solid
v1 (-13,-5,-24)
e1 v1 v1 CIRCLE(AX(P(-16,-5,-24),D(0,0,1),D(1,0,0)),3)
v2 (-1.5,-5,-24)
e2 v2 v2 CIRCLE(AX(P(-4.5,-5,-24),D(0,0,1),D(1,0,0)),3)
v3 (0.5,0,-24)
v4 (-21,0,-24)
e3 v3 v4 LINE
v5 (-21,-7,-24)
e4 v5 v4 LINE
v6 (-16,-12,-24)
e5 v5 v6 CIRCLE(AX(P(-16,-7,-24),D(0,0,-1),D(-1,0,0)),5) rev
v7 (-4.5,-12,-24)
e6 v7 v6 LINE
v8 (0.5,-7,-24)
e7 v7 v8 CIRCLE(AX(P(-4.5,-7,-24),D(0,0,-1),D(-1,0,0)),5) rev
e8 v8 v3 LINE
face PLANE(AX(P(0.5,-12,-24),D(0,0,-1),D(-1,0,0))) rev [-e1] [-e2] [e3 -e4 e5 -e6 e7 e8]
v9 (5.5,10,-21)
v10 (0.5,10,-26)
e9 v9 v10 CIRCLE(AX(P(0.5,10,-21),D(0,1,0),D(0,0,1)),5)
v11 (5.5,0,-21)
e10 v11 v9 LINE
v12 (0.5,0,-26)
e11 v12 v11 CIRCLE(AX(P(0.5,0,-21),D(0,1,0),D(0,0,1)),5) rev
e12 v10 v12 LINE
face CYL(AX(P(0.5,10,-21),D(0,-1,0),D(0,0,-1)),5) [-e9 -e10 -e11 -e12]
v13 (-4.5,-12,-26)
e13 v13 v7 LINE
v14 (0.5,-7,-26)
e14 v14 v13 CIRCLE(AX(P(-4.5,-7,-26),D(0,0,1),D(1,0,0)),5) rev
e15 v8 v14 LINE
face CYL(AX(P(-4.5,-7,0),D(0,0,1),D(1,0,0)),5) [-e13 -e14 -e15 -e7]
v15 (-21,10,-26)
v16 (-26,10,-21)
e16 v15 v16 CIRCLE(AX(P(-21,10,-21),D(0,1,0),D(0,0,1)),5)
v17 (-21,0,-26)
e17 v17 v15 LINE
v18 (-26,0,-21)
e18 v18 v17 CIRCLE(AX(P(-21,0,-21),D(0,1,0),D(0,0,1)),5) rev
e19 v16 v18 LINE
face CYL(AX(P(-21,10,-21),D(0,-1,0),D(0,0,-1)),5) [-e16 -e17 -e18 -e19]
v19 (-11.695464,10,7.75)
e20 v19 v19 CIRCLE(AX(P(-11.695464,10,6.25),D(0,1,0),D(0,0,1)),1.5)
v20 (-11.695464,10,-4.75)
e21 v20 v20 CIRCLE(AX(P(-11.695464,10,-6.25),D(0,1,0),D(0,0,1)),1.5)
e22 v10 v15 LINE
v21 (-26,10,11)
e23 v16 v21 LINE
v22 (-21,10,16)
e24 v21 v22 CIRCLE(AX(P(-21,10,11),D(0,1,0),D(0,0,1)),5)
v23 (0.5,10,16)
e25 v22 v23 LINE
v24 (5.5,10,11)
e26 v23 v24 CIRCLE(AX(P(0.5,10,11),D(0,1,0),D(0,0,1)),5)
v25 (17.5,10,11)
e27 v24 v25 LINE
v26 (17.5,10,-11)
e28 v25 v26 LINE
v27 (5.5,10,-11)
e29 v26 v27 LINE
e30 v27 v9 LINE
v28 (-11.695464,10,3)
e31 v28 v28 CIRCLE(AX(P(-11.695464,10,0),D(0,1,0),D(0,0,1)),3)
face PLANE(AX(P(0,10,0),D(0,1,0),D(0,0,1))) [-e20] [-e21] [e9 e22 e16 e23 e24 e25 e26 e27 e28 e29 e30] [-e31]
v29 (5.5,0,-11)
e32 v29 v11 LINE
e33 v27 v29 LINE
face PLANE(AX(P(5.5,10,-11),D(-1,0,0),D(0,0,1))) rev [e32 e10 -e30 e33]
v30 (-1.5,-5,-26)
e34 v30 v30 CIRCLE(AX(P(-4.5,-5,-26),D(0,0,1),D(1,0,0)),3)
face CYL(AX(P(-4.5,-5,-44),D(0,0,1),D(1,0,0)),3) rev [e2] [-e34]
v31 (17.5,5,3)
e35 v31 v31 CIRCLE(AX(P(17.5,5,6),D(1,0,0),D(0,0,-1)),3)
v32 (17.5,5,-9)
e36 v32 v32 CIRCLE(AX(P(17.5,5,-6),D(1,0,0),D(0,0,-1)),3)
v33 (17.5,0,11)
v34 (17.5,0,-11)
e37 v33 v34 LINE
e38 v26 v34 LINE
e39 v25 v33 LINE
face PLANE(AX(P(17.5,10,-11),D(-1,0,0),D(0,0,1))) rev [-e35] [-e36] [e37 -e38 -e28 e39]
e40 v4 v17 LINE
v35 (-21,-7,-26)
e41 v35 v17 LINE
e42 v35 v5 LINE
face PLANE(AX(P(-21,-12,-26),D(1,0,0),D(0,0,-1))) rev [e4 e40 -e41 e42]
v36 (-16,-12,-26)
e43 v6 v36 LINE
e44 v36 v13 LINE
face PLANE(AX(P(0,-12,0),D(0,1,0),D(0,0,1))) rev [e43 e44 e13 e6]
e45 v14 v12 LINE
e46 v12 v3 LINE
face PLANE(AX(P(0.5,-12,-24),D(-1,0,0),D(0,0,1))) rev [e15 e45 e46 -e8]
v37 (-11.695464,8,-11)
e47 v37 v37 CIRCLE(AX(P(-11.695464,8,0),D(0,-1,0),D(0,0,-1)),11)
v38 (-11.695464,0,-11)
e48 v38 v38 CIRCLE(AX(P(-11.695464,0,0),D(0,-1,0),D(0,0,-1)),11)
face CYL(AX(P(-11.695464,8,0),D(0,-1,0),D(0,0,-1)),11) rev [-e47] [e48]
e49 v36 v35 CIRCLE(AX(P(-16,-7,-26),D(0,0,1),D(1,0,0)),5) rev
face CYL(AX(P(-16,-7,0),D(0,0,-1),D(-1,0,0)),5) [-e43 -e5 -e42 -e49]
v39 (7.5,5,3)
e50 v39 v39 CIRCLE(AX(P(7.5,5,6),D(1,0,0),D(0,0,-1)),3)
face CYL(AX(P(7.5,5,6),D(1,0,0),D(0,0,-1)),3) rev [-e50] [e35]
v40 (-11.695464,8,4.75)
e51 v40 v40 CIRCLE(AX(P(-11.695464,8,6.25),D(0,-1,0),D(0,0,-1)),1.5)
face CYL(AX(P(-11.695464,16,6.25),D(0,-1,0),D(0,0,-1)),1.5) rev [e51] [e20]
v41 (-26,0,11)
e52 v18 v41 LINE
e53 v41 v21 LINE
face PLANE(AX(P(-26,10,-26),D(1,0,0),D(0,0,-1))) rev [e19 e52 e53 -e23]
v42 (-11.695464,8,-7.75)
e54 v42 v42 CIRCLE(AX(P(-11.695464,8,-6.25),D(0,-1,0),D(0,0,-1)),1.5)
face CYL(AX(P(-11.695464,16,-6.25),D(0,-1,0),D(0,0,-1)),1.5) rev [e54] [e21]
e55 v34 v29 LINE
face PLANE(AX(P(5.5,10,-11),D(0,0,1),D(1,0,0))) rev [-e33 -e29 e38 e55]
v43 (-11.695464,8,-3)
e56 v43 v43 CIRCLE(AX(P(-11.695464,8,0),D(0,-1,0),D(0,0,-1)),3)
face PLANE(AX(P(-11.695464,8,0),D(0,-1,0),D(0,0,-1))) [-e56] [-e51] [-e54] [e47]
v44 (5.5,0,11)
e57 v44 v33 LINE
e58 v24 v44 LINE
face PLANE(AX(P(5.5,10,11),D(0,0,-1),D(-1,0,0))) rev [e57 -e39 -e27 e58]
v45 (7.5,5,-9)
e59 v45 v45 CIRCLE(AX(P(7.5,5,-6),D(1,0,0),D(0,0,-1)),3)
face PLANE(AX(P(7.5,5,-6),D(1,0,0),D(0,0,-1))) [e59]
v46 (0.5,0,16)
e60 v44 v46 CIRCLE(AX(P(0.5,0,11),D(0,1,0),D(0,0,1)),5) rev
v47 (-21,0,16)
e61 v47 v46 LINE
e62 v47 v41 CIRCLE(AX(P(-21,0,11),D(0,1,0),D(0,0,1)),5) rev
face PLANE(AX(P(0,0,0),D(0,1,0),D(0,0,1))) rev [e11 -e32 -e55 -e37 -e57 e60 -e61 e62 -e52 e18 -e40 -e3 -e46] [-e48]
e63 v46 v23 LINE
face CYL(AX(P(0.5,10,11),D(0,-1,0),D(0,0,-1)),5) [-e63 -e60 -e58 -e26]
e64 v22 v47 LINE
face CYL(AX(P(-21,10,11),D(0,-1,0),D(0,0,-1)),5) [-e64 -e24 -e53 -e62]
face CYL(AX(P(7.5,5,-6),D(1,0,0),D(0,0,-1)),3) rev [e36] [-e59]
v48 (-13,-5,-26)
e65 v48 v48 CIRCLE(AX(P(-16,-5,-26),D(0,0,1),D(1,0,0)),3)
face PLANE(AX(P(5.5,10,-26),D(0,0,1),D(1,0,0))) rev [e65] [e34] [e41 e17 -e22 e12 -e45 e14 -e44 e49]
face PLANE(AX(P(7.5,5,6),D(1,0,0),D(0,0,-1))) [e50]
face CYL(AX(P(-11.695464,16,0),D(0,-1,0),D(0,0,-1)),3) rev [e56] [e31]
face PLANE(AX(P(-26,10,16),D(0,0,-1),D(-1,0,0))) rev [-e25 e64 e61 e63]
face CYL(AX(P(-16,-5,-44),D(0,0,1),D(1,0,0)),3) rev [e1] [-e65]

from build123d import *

# Parameters (mm, degrees)
BOSS_EXTRUDE1_DEPTH = 10
SKETCH2_R           = 3
CUT_EXTRUDE1_DEPTH  = 10
SKETCH4_R           = 11
CUT_EXTRUDE3_DEPTH  = 8
SKETCH5_R           = 3
SKETCH5_R_2         = 1.5
CUT_EXTRUDE4_DEPTH  = 8
SKETCH7_W           = 21.5
SKETCH7_H           = 2
BOSS_EXTRUDE2_DEPTH = 12
FILLET1_R           = 5
SKETCH8_R           = 3
CUT_EXTRUDE5_DEPTH  = 20
FILLET2_R           = 5


with BuildPart() as part:
    # Sketch1 → Boss-Extrude1 (new body)
    with BuildSketch(Plane(origin=(0, 0, 0), x_dir=(1, 0, 0), z_dir=(0, 1, 0))):
        Polygon((5.5, 11), (5.5, 26), (-26, 26), (-26, -16), (5.5, -16), (5.5, -11), (17.5, -11), (17.5, 11), align=None)
    extrude(amount=BOSS_EXTRUDE1_DEPTH)

    # Sketch2 → Cut-Extrude1 (cut)
    with BuildSketch(Plane(origin=(17.5, 0, 0), x_dir=(0, 0, -1), z_dir=(1, 0, 0))):
        with Locations((-6, 5)):
            Circle(SKETCH2_R)
        with Locations((6, 5)):
            Circle(SKETCH2_R)
    extrude(amount=-CUT_EXTRUDE1_DEPTH, mode=Mode.SUBTRACT)

    # Sketch4 → Cut-Extrude3 (cut)
    with BuildSketch(Plane.XZ):
        with Locations(Location((-11.695464036, 0, 0), (0, 0, 270))):
            Circle(SKETCH4_R)
    extrude(amount=-CUT_EXTRUDE3_DEPTH, mode=Mode.SUBTRACT)

    # Sketch5 → Cut-Extrude4 (cut)
    with BuildSketch(Plane(origin=(0, 8, 0), x_dir=(-1, 0, 0), z_dir=(0, -1, 0))):
        with Locations(Location((11.695464036, 0, 0), (0, 0, 90))):
            Circle(SKETCH5_R)
        with Locations(Location((11.695464036, -6.25, 0), (0, 0, 90))):
            Circle(SKETCH5_R_2)
        with Locations(Location((11.695464036, 6.25, 0), (0, 0, 90))):
            Circle(SKETCH5_R_2)
    extrude(amount=-CUT_EXTRUDE4_DEPTH, mode=Mode.SUBTRACT)

    # Sketch7 → Boss-Extrude2 (add)
    with BuildSketch(Plane(origin=(0, 0, 0), x_dir=(-1, 0, 0), z_dir=(0, -1, 0))):
        with Locations((10.25, 25)):
            Rectangle(SKETCH7_W, SKETCH7_H)
    extrude(amount=BOSS_EXTRUDE2_DEPTH)

    # Fillet1
    fillet1_edges = [part.edges().sort_by_distance(p)[0] for p in [
        (-26, 5, -26),
        (5.5, 5, -26),
        (5.5, 5, 16),
        (-26, 5, 16),
    ]]
    fillet(fillet1_edges, radius=FILLET1_R - 0.0001)  # a hair under: the kernel refuses the full size

    # Sketch8 → Cut-Extrude5 (cut)
    with BuildSketch(Plane.XY.offset(-24)):
        with Locations((-16, -5)):
            Circle(SKETCH8_R)
        with Locations((-4.5, -5)):
            Circle(SKETCH8_R)
    extrude(amount=-CUT_EXTRUDE5_DEPTH, mode=Mode.SUBTRACT)

    # Fillet2
    fillet2_edges = [part.edges().sort_by_distance(p)[0] for p in [
        (0.5, -12, -25),
        (-21, -12, -25),
    ]]
    fillet(fillet2_edges, radius=FILLET2_R)


solid = part.part
